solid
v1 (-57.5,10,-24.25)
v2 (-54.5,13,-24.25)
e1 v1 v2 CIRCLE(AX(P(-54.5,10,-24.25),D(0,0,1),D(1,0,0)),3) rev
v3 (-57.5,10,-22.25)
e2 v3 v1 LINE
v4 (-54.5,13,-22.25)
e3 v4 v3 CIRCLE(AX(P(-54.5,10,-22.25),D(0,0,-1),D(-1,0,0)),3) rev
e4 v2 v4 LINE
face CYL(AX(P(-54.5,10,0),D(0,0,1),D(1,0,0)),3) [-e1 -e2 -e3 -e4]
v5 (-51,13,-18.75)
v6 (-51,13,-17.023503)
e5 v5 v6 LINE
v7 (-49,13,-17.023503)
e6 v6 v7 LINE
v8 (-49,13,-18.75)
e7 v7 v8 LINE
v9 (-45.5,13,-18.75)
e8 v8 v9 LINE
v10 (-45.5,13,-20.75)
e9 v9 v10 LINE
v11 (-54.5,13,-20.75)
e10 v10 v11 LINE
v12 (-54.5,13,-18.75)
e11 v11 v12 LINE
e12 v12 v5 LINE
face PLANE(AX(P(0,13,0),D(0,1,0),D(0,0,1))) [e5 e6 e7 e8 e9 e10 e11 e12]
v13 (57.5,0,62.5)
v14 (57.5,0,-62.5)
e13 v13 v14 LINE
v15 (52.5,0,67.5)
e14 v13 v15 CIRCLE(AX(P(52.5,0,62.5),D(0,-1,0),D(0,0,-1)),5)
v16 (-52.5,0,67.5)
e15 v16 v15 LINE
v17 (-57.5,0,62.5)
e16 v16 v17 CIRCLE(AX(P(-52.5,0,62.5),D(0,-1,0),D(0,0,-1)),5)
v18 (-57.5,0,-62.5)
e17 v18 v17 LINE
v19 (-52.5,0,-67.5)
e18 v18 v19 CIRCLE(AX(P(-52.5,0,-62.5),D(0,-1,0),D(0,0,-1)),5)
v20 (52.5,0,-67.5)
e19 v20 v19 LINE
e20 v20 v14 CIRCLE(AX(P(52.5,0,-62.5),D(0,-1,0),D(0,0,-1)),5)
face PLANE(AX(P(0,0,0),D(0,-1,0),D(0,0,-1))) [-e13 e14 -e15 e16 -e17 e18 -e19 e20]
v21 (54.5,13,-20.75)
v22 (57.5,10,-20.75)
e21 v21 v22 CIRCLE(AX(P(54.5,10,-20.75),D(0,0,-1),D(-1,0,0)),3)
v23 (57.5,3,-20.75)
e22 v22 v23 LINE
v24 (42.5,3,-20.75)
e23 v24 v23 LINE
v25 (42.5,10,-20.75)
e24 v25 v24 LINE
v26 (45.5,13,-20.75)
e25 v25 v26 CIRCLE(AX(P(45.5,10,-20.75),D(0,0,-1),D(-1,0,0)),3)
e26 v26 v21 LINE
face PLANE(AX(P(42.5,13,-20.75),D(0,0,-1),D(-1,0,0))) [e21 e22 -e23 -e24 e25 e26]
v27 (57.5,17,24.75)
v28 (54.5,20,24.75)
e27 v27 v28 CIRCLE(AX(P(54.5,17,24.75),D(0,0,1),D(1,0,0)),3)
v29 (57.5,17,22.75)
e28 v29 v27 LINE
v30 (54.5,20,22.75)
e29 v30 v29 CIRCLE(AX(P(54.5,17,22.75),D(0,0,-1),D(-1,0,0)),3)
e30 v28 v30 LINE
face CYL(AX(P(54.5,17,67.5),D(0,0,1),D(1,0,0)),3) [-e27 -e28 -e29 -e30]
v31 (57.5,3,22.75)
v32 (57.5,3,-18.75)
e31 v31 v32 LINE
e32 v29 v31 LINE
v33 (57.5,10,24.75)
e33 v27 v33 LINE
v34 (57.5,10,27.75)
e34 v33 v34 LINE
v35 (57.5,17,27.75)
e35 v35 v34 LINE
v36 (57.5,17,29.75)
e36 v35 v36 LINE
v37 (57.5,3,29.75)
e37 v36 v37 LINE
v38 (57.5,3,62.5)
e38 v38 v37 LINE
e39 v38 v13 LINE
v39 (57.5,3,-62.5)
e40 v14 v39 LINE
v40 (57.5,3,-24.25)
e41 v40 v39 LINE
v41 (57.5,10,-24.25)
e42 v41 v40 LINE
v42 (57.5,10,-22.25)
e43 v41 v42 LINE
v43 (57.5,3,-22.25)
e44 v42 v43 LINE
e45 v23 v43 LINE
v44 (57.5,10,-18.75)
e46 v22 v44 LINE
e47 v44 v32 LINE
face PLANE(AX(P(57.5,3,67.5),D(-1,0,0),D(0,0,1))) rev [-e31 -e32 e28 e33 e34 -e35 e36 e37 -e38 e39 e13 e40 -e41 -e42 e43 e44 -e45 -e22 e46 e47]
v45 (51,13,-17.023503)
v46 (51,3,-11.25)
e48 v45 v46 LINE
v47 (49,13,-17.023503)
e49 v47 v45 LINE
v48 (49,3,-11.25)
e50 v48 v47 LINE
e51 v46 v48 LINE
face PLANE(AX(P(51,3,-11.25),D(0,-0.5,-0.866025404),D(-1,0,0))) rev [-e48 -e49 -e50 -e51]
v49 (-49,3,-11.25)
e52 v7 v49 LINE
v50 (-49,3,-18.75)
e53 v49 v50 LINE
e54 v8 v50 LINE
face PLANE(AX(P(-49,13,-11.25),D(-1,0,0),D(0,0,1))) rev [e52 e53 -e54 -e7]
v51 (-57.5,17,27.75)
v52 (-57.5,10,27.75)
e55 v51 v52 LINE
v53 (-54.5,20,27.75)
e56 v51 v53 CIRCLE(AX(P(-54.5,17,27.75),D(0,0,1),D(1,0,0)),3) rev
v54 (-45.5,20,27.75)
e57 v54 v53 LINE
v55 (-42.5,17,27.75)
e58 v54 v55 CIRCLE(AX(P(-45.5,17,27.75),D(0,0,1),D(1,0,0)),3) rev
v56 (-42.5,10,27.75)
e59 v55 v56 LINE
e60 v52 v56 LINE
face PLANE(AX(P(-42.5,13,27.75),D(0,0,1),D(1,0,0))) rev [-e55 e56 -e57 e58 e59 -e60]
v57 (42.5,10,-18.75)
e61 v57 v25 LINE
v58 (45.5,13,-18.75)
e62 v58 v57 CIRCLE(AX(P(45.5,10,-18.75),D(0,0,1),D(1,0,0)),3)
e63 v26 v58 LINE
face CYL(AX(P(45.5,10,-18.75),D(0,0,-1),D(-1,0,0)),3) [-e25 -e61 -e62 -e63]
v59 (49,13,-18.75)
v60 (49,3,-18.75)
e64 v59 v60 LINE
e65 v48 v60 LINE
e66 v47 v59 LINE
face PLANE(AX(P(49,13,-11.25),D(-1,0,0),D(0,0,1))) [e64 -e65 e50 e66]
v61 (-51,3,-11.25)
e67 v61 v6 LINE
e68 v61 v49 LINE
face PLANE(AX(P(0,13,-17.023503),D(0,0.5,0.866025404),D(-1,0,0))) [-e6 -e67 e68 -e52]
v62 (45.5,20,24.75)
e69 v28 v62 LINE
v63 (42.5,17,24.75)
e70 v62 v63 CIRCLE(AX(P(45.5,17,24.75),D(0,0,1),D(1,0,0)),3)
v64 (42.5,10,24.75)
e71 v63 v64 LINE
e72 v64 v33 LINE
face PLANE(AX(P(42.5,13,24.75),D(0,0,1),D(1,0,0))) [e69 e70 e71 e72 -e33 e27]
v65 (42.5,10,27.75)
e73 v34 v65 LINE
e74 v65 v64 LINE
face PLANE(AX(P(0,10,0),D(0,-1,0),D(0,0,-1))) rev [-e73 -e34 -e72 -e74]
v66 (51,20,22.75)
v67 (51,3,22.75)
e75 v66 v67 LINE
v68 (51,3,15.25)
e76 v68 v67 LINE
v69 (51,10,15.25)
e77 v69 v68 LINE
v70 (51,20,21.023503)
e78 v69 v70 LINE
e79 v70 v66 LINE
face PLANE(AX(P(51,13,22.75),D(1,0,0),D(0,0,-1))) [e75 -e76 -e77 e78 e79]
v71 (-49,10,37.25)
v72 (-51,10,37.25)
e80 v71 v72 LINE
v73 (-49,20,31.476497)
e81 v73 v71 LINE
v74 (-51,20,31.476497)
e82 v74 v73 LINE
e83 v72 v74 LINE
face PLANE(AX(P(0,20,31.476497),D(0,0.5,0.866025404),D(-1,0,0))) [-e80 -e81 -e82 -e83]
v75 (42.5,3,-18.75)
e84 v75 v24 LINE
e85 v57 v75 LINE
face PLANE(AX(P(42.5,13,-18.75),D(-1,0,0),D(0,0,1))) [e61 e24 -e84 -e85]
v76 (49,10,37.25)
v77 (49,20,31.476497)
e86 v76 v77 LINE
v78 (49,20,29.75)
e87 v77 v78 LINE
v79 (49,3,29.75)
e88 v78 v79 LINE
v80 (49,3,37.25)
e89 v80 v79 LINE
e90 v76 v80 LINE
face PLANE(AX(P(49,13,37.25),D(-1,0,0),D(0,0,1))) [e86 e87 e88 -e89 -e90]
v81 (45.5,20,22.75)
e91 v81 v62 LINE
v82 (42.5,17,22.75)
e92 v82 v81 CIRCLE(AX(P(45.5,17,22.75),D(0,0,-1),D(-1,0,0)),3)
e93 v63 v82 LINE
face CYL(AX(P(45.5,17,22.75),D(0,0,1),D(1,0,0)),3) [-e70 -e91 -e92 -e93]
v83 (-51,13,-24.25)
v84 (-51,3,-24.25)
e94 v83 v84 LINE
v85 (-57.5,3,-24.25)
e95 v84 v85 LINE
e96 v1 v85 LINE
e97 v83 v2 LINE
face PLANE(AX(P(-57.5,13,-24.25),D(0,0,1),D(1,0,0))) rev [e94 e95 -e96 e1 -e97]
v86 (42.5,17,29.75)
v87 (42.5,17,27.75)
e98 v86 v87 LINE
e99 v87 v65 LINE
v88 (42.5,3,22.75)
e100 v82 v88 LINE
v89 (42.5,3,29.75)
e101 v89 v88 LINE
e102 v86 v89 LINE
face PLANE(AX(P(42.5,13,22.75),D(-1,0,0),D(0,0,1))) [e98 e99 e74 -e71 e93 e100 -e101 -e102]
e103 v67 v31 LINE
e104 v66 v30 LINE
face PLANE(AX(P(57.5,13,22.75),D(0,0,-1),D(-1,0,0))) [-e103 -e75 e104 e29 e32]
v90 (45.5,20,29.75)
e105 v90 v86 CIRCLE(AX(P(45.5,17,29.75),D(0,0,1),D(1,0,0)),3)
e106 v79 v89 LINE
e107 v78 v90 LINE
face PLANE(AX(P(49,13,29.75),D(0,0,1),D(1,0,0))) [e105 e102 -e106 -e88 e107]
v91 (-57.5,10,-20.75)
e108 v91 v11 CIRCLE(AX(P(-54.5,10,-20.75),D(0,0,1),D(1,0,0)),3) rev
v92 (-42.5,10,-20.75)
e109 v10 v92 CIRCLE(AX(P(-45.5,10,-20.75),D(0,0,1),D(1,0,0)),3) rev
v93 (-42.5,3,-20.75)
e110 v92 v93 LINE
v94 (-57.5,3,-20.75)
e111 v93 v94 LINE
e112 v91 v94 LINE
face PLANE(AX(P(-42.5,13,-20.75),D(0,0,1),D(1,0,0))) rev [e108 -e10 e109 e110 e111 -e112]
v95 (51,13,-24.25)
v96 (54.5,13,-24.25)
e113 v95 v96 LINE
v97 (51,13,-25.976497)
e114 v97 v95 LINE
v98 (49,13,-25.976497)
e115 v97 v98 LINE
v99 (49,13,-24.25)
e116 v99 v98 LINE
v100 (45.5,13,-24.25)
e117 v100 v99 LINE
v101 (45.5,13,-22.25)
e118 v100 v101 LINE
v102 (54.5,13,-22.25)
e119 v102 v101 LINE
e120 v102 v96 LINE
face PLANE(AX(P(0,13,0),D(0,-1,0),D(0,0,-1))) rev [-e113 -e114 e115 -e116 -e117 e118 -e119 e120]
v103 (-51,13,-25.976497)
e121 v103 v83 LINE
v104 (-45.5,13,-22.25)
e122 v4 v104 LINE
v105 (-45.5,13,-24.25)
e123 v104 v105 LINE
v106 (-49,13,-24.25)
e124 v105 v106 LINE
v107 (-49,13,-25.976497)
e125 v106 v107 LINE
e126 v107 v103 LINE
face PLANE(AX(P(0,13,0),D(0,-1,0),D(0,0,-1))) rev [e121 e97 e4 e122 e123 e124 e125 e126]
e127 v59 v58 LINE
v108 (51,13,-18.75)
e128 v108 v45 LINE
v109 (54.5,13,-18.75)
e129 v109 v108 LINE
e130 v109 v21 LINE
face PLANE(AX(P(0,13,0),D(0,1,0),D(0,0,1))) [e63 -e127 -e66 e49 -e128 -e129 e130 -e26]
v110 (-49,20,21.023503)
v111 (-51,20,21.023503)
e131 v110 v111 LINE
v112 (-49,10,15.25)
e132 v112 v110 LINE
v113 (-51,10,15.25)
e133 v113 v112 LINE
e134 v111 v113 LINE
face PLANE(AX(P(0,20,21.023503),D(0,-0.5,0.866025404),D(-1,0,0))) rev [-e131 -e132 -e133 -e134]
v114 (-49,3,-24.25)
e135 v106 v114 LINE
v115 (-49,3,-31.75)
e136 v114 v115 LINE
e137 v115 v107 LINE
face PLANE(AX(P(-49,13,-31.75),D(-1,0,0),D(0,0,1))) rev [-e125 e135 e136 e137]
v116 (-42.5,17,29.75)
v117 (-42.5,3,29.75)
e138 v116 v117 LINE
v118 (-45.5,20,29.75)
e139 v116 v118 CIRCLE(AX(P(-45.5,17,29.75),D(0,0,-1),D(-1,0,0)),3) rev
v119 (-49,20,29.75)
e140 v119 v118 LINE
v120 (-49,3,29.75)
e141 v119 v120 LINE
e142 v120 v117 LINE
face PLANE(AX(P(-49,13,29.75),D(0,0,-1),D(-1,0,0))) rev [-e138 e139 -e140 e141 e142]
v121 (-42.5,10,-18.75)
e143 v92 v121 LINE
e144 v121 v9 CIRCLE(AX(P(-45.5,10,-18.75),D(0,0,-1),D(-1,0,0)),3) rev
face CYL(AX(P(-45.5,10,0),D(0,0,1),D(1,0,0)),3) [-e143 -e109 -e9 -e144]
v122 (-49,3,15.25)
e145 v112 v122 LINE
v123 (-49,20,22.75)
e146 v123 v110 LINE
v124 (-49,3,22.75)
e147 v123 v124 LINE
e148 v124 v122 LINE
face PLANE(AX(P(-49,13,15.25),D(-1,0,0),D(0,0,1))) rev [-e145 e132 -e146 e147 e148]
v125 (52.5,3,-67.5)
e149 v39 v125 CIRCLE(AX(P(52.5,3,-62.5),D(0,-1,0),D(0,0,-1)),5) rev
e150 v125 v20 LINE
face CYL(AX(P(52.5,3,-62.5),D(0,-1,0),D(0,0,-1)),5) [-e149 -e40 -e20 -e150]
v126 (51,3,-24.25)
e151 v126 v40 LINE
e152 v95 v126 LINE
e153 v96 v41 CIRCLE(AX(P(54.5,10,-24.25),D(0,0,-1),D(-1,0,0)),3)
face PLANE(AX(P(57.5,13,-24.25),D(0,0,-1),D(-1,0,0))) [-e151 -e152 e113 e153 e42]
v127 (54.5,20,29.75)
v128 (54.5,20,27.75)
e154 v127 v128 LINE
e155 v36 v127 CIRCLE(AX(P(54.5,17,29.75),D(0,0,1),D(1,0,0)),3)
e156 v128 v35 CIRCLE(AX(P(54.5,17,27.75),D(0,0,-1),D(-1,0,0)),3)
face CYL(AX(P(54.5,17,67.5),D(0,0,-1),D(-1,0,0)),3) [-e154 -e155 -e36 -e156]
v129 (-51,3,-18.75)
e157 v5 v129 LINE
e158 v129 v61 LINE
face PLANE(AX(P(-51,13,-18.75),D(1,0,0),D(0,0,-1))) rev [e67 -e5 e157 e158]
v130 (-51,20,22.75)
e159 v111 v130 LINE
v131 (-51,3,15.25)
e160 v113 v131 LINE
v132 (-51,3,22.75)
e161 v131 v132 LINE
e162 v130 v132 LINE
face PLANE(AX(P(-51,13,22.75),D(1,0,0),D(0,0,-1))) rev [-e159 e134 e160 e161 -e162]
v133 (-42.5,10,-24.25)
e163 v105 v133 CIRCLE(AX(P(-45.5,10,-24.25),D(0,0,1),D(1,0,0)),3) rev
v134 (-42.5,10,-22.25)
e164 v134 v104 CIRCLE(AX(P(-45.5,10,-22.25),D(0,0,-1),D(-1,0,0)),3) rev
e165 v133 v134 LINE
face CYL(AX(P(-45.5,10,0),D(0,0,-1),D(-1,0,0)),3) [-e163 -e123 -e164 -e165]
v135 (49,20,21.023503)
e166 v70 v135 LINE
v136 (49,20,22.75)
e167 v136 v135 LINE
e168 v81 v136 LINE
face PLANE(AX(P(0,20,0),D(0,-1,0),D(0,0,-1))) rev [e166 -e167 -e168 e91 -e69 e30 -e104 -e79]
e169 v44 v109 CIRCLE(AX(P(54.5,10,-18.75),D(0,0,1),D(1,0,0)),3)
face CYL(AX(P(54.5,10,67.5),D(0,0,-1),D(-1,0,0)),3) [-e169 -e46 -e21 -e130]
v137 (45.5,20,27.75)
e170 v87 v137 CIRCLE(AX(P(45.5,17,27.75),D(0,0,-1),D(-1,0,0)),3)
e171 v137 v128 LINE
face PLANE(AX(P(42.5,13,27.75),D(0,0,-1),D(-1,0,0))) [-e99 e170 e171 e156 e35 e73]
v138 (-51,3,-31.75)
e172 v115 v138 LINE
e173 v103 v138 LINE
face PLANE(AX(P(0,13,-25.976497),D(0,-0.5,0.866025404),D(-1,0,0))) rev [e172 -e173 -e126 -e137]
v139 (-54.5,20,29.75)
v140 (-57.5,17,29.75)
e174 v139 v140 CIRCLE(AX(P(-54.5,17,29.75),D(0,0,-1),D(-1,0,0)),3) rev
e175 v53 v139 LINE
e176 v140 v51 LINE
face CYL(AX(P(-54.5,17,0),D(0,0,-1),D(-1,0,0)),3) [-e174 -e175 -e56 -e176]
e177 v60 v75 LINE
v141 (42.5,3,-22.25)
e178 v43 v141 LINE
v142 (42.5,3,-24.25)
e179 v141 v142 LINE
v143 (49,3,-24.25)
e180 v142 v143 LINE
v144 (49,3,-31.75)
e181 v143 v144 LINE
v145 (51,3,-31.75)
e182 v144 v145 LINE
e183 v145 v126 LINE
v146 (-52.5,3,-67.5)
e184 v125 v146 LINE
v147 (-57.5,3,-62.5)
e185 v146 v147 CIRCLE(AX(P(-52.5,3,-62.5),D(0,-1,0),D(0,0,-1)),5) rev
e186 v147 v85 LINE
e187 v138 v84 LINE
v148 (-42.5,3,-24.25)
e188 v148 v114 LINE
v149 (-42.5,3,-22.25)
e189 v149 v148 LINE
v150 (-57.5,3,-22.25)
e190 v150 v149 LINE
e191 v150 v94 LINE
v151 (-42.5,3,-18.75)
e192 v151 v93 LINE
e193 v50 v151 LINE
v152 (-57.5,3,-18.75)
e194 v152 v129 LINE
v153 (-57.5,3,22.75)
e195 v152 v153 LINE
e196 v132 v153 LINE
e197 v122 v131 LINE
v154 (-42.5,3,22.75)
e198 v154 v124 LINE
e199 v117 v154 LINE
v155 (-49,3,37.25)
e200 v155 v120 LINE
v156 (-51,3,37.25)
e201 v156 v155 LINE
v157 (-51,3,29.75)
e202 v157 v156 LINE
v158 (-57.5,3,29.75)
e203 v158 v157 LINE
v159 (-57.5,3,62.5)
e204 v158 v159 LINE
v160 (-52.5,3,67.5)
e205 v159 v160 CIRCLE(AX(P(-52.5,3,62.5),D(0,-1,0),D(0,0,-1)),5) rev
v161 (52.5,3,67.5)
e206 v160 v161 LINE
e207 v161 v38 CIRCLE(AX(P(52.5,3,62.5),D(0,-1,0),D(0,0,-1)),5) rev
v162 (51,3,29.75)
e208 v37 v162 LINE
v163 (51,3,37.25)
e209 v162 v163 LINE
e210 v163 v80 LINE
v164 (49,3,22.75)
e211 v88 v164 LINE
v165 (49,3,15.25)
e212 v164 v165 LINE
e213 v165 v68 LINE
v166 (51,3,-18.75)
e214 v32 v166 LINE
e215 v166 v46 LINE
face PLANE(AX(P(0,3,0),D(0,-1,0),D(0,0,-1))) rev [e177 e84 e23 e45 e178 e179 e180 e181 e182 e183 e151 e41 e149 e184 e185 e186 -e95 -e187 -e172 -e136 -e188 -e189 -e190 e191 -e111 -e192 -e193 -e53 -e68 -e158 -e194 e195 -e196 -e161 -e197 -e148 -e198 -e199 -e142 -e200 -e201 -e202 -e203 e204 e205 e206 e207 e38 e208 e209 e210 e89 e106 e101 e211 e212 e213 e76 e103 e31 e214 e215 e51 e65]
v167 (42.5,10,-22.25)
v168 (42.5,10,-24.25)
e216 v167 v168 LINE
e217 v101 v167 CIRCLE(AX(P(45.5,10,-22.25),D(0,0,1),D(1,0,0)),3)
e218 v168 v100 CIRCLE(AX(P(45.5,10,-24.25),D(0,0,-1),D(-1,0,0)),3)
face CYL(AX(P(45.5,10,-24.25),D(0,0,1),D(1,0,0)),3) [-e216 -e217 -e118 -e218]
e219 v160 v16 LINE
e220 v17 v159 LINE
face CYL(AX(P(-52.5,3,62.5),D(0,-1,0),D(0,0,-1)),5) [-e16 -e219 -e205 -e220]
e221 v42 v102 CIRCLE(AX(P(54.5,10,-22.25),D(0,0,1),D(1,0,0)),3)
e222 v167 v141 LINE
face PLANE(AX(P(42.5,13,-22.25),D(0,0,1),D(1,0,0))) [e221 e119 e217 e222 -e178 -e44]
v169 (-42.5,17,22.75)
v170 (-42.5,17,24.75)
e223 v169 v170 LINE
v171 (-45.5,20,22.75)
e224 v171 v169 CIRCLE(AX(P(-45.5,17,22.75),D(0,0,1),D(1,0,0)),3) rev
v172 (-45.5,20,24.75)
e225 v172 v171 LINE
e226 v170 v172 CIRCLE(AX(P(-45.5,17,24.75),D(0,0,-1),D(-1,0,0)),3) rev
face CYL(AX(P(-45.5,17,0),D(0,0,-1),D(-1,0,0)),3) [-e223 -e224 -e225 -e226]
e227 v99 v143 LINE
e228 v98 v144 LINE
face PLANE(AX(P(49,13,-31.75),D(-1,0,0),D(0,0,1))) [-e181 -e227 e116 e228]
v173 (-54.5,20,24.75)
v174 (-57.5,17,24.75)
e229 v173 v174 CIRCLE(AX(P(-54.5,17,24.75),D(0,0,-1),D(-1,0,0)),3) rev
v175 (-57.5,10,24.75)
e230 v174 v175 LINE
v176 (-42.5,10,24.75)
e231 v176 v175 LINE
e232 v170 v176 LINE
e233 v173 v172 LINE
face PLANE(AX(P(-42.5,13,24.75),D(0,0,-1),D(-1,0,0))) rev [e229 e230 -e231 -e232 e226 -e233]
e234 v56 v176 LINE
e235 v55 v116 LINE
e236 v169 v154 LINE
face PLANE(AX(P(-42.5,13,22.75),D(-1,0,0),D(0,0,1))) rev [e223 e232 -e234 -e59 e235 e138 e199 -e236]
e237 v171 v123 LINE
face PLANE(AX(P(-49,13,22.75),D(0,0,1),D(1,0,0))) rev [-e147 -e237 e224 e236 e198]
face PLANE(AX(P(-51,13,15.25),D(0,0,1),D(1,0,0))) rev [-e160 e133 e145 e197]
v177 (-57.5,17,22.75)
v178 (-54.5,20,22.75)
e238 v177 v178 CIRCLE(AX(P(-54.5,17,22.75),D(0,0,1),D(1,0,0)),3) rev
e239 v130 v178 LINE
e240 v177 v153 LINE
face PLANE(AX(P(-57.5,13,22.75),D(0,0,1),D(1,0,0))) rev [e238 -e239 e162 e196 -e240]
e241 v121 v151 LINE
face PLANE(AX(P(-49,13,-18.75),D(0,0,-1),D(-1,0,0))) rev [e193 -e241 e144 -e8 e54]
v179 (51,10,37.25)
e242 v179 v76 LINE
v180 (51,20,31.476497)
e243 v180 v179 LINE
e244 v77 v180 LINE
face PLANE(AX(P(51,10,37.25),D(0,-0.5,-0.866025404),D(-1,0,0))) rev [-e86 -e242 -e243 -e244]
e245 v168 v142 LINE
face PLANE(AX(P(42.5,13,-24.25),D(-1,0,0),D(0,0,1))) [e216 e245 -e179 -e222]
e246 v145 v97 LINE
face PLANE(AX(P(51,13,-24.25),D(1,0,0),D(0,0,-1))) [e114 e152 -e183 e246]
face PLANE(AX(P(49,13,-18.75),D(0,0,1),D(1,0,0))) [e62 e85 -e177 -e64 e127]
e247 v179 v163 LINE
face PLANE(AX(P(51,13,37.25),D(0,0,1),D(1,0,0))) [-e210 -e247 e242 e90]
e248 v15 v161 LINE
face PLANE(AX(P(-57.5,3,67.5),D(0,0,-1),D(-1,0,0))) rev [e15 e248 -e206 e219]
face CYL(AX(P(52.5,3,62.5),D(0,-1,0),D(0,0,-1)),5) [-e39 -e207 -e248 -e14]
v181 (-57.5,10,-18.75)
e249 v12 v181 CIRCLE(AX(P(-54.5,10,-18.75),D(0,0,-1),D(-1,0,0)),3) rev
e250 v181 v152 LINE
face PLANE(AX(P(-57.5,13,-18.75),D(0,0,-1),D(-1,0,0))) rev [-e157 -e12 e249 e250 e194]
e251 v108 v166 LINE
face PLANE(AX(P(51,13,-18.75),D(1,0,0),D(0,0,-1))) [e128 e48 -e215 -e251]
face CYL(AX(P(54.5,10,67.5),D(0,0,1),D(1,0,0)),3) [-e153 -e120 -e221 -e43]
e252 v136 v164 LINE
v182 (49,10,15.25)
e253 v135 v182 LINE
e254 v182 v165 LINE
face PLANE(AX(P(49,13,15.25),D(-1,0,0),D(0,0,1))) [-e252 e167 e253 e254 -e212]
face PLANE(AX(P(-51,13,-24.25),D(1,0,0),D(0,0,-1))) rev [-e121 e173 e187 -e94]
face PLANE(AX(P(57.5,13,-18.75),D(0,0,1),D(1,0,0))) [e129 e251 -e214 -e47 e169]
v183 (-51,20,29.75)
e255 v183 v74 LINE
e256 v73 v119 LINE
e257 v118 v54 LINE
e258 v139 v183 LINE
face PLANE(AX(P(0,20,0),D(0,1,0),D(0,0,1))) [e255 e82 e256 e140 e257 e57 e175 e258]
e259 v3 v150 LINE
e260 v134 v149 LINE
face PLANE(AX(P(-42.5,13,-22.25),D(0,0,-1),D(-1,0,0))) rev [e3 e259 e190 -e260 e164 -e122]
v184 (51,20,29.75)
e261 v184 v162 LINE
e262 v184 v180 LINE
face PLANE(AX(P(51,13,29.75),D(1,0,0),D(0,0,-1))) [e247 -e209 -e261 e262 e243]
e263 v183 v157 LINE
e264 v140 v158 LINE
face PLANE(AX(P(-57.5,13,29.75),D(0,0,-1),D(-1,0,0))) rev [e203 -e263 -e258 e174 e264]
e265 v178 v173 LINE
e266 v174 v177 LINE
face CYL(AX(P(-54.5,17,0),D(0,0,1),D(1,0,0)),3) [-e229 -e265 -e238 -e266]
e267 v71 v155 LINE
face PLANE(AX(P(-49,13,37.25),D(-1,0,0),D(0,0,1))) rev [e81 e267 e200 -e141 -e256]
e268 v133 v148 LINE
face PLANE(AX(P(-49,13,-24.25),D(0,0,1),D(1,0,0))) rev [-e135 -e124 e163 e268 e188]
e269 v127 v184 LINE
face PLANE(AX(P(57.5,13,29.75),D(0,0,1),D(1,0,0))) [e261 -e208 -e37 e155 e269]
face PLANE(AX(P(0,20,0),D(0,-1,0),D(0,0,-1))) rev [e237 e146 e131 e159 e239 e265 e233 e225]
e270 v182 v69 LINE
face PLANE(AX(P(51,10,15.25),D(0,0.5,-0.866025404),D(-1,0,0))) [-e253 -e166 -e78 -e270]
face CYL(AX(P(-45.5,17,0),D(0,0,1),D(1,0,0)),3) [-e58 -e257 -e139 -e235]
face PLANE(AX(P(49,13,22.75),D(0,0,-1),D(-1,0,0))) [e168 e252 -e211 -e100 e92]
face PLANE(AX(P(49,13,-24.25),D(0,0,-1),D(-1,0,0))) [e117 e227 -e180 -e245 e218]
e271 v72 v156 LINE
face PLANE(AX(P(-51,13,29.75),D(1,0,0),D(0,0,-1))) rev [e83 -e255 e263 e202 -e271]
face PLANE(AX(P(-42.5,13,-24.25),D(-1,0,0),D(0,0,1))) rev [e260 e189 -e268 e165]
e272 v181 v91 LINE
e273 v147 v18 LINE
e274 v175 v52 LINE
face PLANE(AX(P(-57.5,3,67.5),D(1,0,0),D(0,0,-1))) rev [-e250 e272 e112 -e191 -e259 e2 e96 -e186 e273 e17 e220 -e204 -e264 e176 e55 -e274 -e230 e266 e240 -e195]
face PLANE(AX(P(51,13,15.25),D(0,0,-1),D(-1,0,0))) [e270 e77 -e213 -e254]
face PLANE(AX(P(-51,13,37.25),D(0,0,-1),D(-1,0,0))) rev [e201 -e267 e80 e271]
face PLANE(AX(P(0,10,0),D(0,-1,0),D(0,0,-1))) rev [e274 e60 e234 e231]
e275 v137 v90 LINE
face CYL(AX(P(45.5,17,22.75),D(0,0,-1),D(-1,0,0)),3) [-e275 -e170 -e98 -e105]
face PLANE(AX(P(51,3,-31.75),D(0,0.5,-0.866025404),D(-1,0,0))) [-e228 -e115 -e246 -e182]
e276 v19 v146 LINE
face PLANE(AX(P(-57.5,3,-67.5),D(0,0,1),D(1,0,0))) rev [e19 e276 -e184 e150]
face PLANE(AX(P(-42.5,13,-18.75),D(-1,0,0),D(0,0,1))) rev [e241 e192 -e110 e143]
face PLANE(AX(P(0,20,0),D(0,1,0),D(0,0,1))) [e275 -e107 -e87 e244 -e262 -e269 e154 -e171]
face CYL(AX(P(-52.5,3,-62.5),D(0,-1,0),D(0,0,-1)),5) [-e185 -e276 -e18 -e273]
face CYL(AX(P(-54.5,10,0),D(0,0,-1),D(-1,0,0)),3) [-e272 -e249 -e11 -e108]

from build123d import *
from OCP.BRepFilletAPI import BRepFilletAPI_MakeChamfer

# Parameters (mm, degrees)
ESQUISSE1_W                    = 115
ESQUISSE1_H                    = 135
BOSS_EXTRU_1_DEPTH             = 3
BOSS_EXTRU_2_DEPTH             = 10
BOSS_EXTRU_3_DEPTH             = 7
ESQUISSE5_W                    = 15
ESQUISSE5_H                    = 3
BOSS_EXTRU_4_DEPTH             = 7
CHANFREIN1_SIZE                = 5.773502692
CHANFREIN1_SIZE_2              = 10
CONG_1_R                       = 3
CHANFREIN1_OF_SYM_TRIE1_SIZE   = 5.773502692
CHANFREIN1_OF_SYM_TRIE1_SIZE_2 = 10
CONG_1_OF_SYM_TRIE1_R          = 3
CONG_2_R                       = 5


with BuildPart() as part:
    # Esquisse1 → Boss.-Extru.1 (new body)
    with BuildSketch(Plane(origin=(0, 0, 0), x_dir=(1, 0, 0), z_dir=(0, 1, 0))):
        Rectangle(ESQUISSE1_W, ESQUISSE1_H)
    extrude(amount=BOSS_EXTRU_1_DEPTH)

    # Esquisse2 → Boss.-Extru.2 (add)
    with BuildSketch(Plane(origin=(0, 3, 0), x_dir=(1, 0, 0), z_dir=(0, 1, 0))):
        Polygon((-57.5, 24.25), (-51, 24.25), (-51, 31.75), (-49, 31.75), (-49, 24.25), (-42.5, 24.25), (-42.5, 22.25), (-57.5, 22.25), align=None)
        Polygon((-42.5, 18.75), (-42.5, 20.75), (-57.5, 20.75), (-57.5, 18.75), (-51, 18.75), (-51, 11.25), (-49, 11.25), (-49, 18.75), align=None)
        Polygon((-51, -22.75), (-51, -15.25), (-49, -15.25), (-49, -22.75), (-42.5, -22.75), (-42.5, -24.75), (-57.5, -24.75), (-57.5, -22.75), align=None)
        Polygon((-57.5, -29.75), (-51, -29.75), (-51, -37.25), (-49, -37.25), (-49, -29.75), (-42.5, -29.75), (-42.5, -27.75), (-57.5, -27.75), align=None)
    boss_extru_2 = extrude(amount=BOSS_EXTRU_2_DEPTH)

    # Esquisse4 → Boss.-Extru.3 (add)
    with BuildSketch(Plane(origin=(0, 13, 0), x_dir=(1, 0, 0), z_dir=(0, 1, 0))):
        Polygon((-57.5, -27.75), (-57.5, -29.75), (-51, -29.75), (-51, -37.25), (-49, -37.25), (-49, -29.75), (-42.5, -29.75), (-42.5, -27.75), align=None)
        Polygon((-51, -22.75), (-57.5, -22.75), (-57.5, -24.75), (-42.5, -24.75), (-42.5, -22.75), (-49, -22.75), (-49, -15.25), (-51, -15.25), align=None)
    boss_extru_3 = extrude(amount=BOSS_EXTRU_3_DEPTH)

    # Esquisse5 → Boss.-Extru.4 (add)
    with BuildSketch(Plane(origin=(0, 3, 0), x_dir=(1, 0, 0), z_dir=(0, 1, 0))):
        with Locations((-50, -26.25)):
            Rectangle(ESQUISSE5_W, ESQUISSE5_H)
    boss_extru_4 = extrude(amount=BOSS_EXTRU_4_DEPTH)

    # Chanfrein1
    chanfrein1_edges_1 = [part.edges().sort_by_distance(p)[0] for p in [
        (-50, 13, -31.75),
    ]]
    chanfrein1_side_1 = [part.faces().sort_by_distance(p)[0] for p in [
        (-50, 13, -31.634529946),
    ]]
    chanfrein1_edges_2 = [part.edges().sort_by_distance(p)[0] for p in [
        (-50, 13, -11.25),
    ]]
    chanfrein1_side_2 = [part.faces().sort_by_distance(p)[0] for p in [
        (-50, 13, -11.365470054),
    ]]
    chanfrein1_edges_3 = [part.edges().sort_by_distance(p)[0] for p in [
        (-50, 20, 37.25),
    ]]
    chanfrein1_side_3 = [part.faces().sort_by_distance(p)[0] for p in [
        (-50, 20, 37.134529946),
    ]]
    chanfrein1_edges_4 = [part.edges().sort_by_distance(p)[0] for p in [
        (-50, 20, 15.25),
    ]]
    chanfrein1_side_4 = [part.faces().sort_by_distance(p)[0] for p in [
        (-50, 20, 15.365470054),
    ]]
    chanfrein1 = BRepFilletAPI_MakeChamfer(part.part.solid().wrapped)
    for e in chanfrein1_edges_1:
        chanfrein1.Add(CHANFREIN1_SIZE - 0.0001, CHANFREIN1_SIZE_2 - 0.0001, e.wrapped, chanfrein1_side_1[0].wrapped)
    for e in chanfrein1_edges_2:
        chanfrein1.Add(CHANFREIN1_SIZE - 0.0001, CHANFREIN1_SIZE_2 - 0.0001, e.wrapped, chanfrein1_side_2[0].wrapped)
    for e in chanfrein1_edges_3:
        chanfrein1.Add(CHANFREIN1_SIZE - 0.0001, CHANFREIN1_SIZE_2 - 0.0001, e.wrapped, chanfrein1_side_3[0].wrapped)
    for e in chanfrein1_edges_4:
        chanfrein1.Add(CHANFREIN1_SIZE - 0.0001, CHANFREIN1_SIZE_2 - 0.0001, e.wrapped, chanfrein1_side_4[0].wrapped)
    add(Compound.cast(chanfrein1.Shape()), mode=Mode.REPLACE)  # a hair under: the kernel refuses the full size

    # Congé1
    cong_1_edges = [part.edges().sort_by_distance(p)[0] for p in [
        (-57.5, 20, 28.75),
        (-42.5, 20, 28.75),
        (-57.5, 20, 23.75),
        (-42.5, 20, 23.75),
        (-57.5, 13, -23.25),
        (-42.5, 13, -23.25),
        (-42.5, 13, -19.75),
        (-57.5, 13, -19.75),
    ]]
    fillet(cong_1_edges, radius=CONG_1_R)

    # Symétrie1: Boss.-Extru.2, Boss.-Extru.3, Boss.-Extru.4 across plane
    add(boss_extru_2.mirror(Plane(origin=(0, 0, 0), x_dir=(0, 0, 1), z_dir=(1, 0, 0))))
    add(boss_extru_3.mirror(Plane(origin=(0, 0, 0), x_dir=(0, 0, 1), z_dir=(1, 0, 0))))
    add(boss_extru_4.mirror(Plane(origin=(0, 0, 0), x_dir=(0, 0, 1), z_dir=(1, 0, 0))))

    # Chanfrein1 of Symétrie1
    chanfrein1_of_sym_trie1_edges_1 = [part.edges().sort_by_distance(p)[0] for p in [
        (50, 13, -31.75),
    ]]
    chanfrein1_of_sym_trie1_side_1 = [part.faces().sort_by_distance(p)[0] for p in [
        (50, 13, -31.634529946),
    ]]
    chanfrein1_of_sym_trie1_edges_2 = [part.edges().sort_by_distance(p)[0] for p in [
        (50, 13, -11.25),
    ]]
    chanfrein1_of_sym_trie1_side_2 = [part.faces().sort_by_distance(p)[0] for p in [
        (50, 13, -11.365470054),
    ]]
    chanfrein1_of_sym_trie1_edges_3 = [part.edges().sort_by_distance(p)[0] for p in [
        (50, 20, 37.25),
    ]]
    chanfrein1_of_sym_trie1_side_3 = [part.faces().sort_by_distance(p)[0] for p in [
        (50, 20, 37.134529946),
    ]]
    chanfrein1_of_sym_trie1_edges_4 = [part.edges().sort_by_distance(p)[0] for p in [
        (50, 20, 15.25),
    ]]
    chanfrein1_of_sym_trie1_side_4 = [part.faces().sort_by_distance(p)[0] for p in [
        (50, 20, 15.365470054),
    ]]
    chanfrein1_of_sym_trie1 = BRepFilletAPI_MakeChamfer(part.part.solid().wrapped)
    for e in chanfrein1_of_sym_trie1_edges_1:
        chanfrein1_of_sym_trie1.Add(CHANFREIN1_OF_SYM_TRIE1_SIZE - 0.0001, CHANFREIN1_OF_SYM_TRIE1_SIZE_2 - 0.0001, e.wrapped, chanfrein1_of_sym_trie1_side_1[0].wrapped)
    for e in chanfrein1_of_sym_trie1_edges_2:
        chanfrein1_of_sym_trie1.Add(CHANFREIN1_OF_SYM_TRIE1_SIZE - 0.0001, CHANFREIN1_OF_SYM_TRIE1_SIZE_2 - 0.0001, e.wrapped, chanfrein1_of_sym_trie1_side_2[0].wrapped)
    for e in chanfrein1_of_sym_trie1_edges_3:
        chanfrein1_of_sym_trie1.Add(CHANFREIN1_OF_SYM_TRIE1_SIZE - 0.0001, CHANFREIN1_OF_SYM_TRIE1_SIZE_2 - 0.0001, e.wrapped, chanfrein1_of_sym_trie1_side_3[0].wrapped)
    for e in chanfrein1_of_sym_trie1_edges_4:
        chanfrein1_of_sym_trie1.Add(CHANFREIN1_OF_SYM_TRIE1_SIZE - 0.0001, CHANFREIN1_OF_SYM_TRIE1_SIZE_2 - 0.0001, e.wrapped, chanfrein1_of_sym_trie1_side_4[0].wrapped)
    add(Compound.cast(chanfrein1_of_sym_trie1.Shape()), mode=Mode.REPLACE)  # a hair under: the kernel refuses the full size

    # Congé1 of Symétrie1
    cong_1_of_sym_trie1_edges = [part.edges().sort_by_distance(p)[0] for p in [
        (57.5, 20, 28.75),
        (42.5, 20, 28.75),
        (57.5, 20, 23.75),
        (42.5, 20, 23.75),
        (57.5, 13, -23.25),
        (42.5, 13, -23.25),
        (42.5, 13, -19.75),
        (57.5, 13, -19.75),
    ]]
    fillet(cong_1_of_sym_trie1_edges, radius=CONG_1_OF_SYM_TRIE1_R)

    # Congé2
    cong_2_edges = [part.edges().sort_by_distance(p)[0] for p in [
        (57.5, 1.5, 67.5),
        (-57.5, 1.5, 67.5),
        (-57.5, 1.5, -67.5),
        (57.5, 1.5, -67.5),
    ]]
    fillet(cong_2_edges, radius=CONG_2_R)


solid = part.part
